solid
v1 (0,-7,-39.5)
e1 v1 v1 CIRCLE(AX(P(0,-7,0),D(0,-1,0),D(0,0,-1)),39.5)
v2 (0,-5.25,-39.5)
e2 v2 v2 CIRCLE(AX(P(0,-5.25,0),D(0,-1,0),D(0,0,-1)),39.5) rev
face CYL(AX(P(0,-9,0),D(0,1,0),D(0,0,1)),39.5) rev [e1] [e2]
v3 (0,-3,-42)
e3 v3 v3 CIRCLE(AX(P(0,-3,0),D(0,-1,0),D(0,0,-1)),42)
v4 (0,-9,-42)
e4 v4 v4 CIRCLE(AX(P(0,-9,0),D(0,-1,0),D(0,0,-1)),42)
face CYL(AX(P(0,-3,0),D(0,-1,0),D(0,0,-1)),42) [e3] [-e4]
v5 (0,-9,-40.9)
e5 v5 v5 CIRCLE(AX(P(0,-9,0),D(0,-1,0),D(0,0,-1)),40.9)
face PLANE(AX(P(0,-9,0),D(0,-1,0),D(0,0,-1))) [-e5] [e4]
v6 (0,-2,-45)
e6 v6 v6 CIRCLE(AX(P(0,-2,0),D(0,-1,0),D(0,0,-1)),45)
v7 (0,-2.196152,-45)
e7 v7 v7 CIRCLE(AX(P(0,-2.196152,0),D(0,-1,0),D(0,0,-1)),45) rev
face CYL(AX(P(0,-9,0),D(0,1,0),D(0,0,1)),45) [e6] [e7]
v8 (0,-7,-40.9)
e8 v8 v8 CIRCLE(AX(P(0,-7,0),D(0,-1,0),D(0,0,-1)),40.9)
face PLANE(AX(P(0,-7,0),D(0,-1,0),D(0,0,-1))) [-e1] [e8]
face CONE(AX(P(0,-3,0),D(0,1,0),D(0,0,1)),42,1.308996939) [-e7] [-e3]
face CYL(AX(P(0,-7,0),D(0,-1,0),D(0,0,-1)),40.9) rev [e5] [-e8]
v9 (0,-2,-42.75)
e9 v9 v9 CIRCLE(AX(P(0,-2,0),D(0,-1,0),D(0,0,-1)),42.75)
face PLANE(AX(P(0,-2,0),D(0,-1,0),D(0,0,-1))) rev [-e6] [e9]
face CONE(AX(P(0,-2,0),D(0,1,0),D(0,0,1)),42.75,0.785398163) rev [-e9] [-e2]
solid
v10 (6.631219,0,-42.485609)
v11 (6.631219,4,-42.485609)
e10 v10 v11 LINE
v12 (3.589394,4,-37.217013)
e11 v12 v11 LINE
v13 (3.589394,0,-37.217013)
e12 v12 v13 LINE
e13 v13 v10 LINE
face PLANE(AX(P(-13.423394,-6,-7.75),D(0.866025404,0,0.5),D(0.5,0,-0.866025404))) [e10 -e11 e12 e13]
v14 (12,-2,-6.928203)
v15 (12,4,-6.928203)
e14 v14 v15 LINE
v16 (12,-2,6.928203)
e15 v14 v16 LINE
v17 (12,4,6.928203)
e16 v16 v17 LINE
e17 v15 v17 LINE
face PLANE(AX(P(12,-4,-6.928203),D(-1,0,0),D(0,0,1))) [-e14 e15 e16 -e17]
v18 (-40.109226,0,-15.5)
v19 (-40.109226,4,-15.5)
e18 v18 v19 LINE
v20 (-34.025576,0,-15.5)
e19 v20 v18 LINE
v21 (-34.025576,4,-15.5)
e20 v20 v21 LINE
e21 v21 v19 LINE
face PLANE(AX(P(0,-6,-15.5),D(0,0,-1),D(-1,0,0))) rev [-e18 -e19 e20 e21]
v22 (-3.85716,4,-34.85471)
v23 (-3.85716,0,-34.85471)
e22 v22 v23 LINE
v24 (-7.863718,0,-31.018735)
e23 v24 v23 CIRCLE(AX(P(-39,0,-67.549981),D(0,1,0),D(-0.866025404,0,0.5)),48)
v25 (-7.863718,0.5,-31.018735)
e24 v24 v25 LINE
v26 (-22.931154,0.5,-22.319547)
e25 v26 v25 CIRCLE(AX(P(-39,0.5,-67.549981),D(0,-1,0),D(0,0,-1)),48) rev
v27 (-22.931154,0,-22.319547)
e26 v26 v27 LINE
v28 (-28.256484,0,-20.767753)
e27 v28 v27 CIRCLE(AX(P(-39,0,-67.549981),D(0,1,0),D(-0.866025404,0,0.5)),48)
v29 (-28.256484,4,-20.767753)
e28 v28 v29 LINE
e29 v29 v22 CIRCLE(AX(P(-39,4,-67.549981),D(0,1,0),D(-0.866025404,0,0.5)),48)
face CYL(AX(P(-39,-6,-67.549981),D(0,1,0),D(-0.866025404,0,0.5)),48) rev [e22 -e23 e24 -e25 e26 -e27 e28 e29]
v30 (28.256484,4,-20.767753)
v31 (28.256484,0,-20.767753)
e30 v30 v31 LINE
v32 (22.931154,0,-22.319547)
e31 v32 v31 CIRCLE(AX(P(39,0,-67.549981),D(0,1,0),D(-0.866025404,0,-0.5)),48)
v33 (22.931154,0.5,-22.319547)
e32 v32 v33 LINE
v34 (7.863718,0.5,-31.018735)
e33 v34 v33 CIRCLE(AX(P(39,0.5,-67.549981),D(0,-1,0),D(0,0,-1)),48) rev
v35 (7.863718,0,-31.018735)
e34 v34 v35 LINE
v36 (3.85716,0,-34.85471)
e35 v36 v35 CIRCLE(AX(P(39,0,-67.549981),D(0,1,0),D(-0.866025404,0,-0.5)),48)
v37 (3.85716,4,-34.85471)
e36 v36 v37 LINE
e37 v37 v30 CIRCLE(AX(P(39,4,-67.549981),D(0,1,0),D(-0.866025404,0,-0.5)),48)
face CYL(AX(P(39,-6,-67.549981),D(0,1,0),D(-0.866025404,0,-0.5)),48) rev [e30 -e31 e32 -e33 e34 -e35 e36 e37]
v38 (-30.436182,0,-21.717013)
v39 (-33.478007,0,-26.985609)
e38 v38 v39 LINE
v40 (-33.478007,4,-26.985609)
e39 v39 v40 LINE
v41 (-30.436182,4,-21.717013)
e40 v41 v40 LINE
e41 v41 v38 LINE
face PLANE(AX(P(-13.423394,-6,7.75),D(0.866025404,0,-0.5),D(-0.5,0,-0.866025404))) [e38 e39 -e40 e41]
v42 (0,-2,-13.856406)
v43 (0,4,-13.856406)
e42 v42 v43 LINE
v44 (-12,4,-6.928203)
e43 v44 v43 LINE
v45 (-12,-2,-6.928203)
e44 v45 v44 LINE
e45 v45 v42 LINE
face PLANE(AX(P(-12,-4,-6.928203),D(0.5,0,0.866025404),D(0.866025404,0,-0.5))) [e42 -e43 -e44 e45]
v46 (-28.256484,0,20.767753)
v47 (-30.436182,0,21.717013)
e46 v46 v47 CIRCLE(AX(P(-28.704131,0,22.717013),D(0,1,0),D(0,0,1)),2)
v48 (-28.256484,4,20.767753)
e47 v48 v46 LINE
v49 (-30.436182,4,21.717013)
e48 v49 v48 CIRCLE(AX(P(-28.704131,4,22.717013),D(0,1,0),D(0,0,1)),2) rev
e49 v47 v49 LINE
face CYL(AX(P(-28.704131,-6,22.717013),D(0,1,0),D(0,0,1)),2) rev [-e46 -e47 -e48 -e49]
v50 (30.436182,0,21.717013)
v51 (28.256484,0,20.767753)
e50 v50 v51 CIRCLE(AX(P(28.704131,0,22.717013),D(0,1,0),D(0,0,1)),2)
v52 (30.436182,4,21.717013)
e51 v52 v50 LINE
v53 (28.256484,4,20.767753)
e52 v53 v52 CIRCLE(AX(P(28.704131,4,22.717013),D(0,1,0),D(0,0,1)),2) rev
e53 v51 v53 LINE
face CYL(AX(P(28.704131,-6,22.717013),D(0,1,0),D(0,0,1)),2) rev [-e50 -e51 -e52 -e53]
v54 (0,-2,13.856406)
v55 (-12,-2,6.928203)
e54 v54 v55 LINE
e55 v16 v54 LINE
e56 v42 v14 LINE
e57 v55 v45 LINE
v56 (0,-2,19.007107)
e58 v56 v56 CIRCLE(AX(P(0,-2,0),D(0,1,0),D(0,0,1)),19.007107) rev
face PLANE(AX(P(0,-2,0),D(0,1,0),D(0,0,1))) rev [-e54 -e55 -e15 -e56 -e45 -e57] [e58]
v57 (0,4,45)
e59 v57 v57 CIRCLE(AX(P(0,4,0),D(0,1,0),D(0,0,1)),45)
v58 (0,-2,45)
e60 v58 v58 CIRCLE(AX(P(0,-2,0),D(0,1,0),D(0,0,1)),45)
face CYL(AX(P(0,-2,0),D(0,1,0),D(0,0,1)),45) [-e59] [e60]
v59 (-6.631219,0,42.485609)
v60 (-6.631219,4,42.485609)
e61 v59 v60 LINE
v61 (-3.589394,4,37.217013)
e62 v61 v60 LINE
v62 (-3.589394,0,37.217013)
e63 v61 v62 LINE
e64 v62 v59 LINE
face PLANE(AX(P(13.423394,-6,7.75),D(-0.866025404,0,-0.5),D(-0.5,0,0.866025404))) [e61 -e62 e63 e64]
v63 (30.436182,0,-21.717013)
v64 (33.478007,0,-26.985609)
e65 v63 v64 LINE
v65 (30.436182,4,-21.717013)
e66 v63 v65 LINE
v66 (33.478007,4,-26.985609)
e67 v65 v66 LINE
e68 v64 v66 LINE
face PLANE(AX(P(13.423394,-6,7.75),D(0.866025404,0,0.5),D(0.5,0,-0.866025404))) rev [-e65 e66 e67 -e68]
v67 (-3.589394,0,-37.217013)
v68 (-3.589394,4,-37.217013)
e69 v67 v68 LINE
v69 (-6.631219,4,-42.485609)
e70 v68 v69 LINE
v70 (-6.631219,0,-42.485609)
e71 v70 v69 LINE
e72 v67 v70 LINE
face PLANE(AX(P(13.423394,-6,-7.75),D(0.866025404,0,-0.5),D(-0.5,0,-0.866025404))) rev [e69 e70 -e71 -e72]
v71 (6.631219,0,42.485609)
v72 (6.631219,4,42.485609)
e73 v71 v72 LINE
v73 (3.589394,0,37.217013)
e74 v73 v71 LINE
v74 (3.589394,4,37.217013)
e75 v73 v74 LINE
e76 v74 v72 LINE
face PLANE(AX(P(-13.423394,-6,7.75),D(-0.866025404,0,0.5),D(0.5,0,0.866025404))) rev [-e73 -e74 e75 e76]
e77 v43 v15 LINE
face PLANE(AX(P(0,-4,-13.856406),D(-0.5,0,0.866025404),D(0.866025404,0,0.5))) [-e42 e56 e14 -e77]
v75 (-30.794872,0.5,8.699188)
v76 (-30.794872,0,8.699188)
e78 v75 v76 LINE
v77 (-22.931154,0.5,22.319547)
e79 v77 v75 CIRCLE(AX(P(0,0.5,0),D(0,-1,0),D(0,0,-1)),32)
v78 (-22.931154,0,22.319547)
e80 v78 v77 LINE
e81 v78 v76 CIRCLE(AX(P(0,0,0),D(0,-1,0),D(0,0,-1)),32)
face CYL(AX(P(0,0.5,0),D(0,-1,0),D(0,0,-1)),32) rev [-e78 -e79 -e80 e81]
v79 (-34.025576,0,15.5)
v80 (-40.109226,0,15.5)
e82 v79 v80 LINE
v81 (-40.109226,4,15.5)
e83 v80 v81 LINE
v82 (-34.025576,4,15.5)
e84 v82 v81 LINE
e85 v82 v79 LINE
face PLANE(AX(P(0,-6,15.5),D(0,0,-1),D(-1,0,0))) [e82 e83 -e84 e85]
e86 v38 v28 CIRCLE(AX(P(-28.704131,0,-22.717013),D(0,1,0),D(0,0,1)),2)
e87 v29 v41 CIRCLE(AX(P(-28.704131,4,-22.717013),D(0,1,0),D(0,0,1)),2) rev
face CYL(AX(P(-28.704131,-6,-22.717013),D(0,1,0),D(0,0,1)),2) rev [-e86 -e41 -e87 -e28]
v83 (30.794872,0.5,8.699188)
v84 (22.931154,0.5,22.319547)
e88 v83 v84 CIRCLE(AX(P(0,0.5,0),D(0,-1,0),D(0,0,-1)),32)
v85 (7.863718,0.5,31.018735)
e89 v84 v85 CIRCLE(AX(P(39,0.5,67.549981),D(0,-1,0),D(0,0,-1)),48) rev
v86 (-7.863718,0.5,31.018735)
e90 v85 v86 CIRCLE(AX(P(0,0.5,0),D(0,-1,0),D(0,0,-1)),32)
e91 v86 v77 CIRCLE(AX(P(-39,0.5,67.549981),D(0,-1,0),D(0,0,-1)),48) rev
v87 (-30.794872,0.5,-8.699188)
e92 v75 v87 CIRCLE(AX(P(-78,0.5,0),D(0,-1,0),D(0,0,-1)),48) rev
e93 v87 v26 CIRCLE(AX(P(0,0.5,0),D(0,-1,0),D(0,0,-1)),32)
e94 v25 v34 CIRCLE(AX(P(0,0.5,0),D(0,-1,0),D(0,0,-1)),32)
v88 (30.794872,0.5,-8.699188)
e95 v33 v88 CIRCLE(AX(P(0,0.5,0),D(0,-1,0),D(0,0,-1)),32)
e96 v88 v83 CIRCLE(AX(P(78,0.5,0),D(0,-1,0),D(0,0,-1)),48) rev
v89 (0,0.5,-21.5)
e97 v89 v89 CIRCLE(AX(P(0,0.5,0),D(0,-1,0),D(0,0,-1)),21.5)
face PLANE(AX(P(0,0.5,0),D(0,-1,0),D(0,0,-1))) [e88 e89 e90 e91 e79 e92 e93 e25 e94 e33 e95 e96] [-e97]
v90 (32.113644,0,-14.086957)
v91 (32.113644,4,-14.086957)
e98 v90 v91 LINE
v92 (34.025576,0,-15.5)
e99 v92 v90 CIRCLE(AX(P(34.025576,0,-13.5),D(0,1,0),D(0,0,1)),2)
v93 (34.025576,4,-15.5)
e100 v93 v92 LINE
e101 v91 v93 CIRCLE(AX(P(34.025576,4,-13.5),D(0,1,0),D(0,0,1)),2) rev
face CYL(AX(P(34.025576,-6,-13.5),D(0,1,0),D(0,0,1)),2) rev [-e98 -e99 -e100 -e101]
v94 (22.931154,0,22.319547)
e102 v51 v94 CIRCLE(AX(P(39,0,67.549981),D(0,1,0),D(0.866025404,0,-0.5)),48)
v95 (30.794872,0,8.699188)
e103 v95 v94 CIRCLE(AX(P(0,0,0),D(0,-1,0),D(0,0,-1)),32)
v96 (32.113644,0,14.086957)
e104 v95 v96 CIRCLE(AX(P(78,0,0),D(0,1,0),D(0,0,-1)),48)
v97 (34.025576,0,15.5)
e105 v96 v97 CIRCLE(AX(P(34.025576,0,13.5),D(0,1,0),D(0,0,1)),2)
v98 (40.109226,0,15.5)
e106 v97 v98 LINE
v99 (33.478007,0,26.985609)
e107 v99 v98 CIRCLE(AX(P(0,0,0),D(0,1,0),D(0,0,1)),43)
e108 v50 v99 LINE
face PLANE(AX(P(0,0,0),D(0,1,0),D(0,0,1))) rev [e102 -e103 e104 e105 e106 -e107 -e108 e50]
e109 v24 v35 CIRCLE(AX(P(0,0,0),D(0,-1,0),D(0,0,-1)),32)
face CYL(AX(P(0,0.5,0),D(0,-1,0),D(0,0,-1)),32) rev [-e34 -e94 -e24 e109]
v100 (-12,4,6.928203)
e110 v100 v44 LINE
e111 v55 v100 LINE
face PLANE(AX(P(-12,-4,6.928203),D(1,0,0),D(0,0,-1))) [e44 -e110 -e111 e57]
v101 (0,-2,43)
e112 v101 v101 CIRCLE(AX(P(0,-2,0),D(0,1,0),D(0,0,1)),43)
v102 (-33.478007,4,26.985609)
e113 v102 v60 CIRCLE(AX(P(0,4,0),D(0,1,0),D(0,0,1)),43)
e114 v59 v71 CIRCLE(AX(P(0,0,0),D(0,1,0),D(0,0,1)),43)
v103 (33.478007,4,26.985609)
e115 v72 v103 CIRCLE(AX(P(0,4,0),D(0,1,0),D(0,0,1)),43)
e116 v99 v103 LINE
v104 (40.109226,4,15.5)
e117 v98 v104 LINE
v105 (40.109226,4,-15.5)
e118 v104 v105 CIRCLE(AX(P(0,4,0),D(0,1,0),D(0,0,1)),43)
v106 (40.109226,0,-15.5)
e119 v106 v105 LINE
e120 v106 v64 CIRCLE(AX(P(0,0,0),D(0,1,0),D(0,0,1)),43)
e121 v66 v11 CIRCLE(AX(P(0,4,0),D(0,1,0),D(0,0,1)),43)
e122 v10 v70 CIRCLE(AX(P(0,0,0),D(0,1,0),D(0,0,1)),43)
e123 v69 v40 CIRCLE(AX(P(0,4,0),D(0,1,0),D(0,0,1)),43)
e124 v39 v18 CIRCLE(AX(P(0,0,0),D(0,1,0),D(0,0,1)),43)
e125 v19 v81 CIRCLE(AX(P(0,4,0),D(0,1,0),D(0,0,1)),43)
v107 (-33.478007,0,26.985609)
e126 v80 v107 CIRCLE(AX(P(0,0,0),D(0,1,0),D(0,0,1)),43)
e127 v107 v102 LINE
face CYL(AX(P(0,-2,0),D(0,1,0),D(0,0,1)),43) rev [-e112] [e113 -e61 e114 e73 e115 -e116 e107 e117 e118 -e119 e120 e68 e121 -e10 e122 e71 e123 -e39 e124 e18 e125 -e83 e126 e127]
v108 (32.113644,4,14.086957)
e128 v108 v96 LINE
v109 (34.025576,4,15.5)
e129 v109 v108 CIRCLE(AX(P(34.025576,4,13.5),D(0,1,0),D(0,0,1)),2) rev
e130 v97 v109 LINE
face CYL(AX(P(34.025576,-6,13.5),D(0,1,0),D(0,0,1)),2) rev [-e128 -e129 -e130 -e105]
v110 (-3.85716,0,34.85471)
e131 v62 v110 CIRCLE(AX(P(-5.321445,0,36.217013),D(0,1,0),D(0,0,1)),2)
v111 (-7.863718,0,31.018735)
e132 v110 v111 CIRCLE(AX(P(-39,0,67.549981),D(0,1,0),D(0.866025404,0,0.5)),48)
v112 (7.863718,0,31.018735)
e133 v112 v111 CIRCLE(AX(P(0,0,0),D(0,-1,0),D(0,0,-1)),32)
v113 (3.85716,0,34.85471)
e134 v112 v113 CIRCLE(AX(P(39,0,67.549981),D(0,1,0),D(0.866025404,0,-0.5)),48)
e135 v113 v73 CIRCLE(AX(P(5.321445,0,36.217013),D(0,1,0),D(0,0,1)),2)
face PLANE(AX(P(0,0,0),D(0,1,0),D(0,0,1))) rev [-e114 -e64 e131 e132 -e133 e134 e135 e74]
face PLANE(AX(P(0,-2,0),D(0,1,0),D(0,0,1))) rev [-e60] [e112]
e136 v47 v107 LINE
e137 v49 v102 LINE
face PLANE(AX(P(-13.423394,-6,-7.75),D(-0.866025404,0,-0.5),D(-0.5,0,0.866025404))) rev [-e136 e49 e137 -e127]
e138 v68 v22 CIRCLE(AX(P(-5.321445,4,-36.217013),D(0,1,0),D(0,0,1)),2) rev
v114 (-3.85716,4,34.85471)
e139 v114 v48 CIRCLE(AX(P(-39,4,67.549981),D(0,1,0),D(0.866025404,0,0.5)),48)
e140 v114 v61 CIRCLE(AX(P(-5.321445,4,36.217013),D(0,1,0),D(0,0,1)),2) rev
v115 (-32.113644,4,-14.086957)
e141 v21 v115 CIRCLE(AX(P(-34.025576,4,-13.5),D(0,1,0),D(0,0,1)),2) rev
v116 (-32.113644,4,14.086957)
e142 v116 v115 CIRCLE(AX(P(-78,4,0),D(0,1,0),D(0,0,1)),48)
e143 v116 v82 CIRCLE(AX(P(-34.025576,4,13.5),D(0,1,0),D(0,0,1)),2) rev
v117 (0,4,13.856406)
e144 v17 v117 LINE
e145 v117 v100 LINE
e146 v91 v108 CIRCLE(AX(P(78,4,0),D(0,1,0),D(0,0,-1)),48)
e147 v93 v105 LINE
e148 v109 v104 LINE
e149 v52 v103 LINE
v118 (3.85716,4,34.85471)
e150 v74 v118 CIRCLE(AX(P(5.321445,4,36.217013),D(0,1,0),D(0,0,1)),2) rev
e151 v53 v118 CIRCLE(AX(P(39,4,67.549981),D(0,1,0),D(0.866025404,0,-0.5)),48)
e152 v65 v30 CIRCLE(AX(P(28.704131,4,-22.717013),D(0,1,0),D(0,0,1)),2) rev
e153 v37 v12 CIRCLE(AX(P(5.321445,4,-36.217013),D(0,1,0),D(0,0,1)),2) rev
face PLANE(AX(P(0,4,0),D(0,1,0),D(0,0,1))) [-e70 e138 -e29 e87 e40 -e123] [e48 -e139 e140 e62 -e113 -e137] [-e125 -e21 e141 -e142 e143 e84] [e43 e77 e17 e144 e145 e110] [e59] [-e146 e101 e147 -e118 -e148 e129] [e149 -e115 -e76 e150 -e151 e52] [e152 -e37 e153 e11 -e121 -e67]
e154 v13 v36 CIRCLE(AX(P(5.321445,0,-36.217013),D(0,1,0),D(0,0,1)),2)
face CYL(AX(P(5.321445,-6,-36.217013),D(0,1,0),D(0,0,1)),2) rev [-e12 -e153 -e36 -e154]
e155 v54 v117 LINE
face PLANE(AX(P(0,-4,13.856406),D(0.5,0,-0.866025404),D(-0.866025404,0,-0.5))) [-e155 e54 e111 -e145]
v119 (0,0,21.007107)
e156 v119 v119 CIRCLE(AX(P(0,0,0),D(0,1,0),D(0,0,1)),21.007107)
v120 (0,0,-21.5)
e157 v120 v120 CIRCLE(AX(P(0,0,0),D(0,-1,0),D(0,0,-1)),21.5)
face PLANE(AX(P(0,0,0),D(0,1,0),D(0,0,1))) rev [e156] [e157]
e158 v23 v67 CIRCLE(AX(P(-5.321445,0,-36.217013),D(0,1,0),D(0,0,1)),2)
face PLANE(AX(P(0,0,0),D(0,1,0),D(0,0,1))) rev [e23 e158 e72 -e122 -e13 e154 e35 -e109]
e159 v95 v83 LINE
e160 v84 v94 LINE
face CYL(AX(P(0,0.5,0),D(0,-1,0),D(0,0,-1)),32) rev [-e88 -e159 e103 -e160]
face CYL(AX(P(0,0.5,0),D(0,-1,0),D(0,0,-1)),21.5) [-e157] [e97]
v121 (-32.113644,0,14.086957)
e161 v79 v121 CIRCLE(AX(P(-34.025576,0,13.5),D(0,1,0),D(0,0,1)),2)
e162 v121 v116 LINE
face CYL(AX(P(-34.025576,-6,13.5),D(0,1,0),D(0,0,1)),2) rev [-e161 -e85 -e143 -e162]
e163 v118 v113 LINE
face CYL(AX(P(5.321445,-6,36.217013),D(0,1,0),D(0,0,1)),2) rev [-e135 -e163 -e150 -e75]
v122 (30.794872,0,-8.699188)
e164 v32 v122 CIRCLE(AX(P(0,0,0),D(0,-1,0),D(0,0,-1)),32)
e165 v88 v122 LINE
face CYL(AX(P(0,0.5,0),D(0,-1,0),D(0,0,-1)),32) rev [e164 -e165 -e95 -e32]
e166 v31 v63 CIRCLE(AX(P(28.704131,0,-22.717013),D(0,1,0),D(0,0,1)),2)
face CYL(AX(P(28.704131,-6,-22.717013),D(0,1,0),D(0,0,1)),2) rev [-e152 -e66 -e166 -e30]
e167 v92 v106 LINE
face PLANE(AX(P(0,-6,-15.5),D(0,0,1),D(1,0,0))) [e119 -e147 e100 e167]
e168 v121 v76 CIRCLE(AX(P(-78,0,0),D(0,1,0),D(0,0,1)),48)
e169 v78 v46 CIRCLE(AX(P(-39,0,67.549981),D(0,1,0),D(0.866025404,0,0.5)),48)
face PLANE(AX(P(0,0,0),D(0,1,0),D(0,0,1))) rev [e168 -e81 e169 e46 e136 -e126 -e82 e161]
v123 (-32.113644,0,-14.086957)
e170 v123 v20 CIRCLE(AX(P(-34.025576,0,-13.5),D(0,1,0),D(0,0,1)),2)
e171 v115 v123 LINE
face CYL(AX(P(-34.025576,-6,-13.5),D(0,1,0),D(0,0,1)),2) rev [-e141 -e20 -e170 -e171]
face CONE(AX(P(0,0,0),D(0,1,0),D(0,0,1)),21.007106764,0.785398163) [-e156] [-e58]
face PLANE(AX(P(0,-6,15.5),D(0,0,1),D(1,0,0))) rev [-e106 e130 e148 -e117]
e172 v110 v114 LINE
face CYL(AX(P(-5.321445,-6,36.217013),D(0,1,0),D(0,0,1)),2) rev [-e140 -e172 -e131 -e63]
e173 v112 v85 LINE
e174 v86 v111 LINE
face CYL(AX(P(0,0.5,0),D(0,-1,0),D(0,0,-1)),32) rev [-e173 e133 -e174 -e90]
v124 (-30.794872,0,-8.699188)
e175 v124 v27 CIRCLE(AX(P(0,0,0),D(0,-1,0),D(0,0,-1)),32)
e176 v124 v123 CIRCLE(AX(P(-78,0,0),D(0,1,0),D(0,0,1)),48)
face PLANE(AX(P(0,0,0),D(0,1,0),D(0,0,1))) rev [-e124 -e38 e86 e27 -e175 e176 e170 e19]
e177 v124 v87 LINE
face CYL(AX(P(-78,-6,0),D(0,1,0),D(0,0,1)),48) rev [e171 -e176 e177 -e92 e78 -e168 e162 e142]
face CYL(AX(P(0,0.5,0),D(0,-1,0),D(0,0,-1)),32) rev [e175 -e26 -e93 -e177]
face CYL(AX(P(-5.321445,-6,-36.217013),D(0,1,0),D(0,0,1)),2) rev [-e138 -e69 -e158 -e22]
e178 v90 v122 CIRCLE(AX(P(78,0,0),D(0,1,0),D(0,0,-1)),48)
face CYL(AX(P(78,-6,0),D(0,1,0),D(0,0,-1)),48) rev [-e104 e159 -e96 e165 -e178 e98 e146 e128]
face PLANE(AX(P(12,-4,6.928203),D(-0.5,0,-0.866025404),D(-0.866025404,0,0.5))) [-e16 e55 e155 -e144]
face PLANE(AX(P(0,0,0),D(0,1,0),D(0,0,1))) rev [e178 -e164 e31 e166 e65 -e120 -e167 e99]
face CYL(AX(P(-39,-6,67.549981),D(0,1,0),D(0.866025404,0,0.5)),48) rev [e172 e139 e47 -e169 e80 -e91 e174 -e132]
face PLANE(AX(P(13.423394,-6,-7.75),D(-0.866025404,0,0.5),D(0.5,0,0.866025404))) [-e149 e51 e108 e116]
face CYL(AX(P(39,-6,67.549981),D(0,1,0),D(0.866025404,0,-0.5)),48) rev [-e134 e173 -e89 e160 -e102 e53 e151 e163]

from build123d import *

# Parameters (mm, degrees)
SKIZZE1_R                            = 44
AUFSATZ_LINEAR_AUSTRAGEN1_DEPTH      = 4
SCHNITT_LINEAR_START                 = -10
SCHNITT_LINEAR_AUSTRAGEN2_DEPTH      = 10
SKIZZE4_R                            = 21.007106764
AUFSATZ_LINEAR_AUSTRAGEN4_DEPTH      = 6
KREISMUSTER1_COUNT                   = 6
SCHNITT_LINEAR_AUSTRAGEN3_DEPTH      = 4
SCHNITT_LINEAR_AUSTRAGEN3_DEPTH_BACK = 10
VERRUNDUNG1_R                        = 2
SKIZZE8_R                            = 45
SKIZZE8_R_2                          = 43
AUFSATZ_LINEAR_AUSTRAGEN2_DEPTH      = 6
SKIZZE9_R                            = 45
SKIZZE9_R_2                          = 39.5
AUFSATZ_LINEAR_AUSTRAGEN3_DEPTH      = 7
FASE1_SIZE                           = 3.25
SKIZZE7_R                            = 32
SKIZZE7_R_2                          = 21.5
SCHNITT_LINEAR_AUSTRAGEN7_DEPTH      = 0.5
SKIZZE10_R                           = 50
SKIZZE10_R_2                         = 42
SCHNITT_LINEAR_AUSTRAGEN9_DEPTH      = 6
SKIZZE11_R                           = 40.9
SKIZZE11_R_2                         = 30
SCHNITT_LINEAR_AUSTRAGEN10_DEPTH     = 2
FASE2_SIZE                           = 0.803847577
FASE2_SIZE_2                         = 3
FASE3_SIZE                           = 2


# Some blends are built 0.0001 mm under size
with BuildPart() as part:
    # Skizze1 → Aufsatz-Linear austragen1 (new body)
    with BuildSketch(Plane(origin=(0, 0, 0), x_dir=(1, 0, 0), z_dir=(0, 1, 0))):
        with Locations(Location((0, 0, 0), (0, 0, 270))):
            Circle(SKIZZE1_R)
    extrude(amount=AUFSATZ_LINEAR_AUSTRAGEN1_DEPTH)

    # Skizze2 → Schnitt-Linear austragen2 (cut)
    with BuildSketch(Plane(origin=(0, 4, 0), x_dir=(1, 0, 0), z_dir=(0, 1, 0)).offset(SCHNITT_LINEAR_START)):
        with BuildLine():
            ThreePointArc((-30, 0), (-30.647234858, 7.855929826), (-32.571484726, 15.5))
            Line((-32.571484726, 15.5), (-41.179485184, 15.5))
            ThreePointArc((-41.179485184, 15.5), (-44, 0), (-41.179485184, -15.5))
            Line((-41.179485184, -15.5), (-32.571484726, -15.5))
            ThreePointArc((-32.571484726, -15.5), (-30.647234858, -7.855929826), (-30, 0))
        make_face()
    schnitt_linear_austragen2 = extrude(amount=SCHNITT_LINEAR_AUSTRAGEN2_DEPTH, mode=Mode.SUBTRACT)

    # Skizze4 → Aufsatz-Linear austragen4 (add)
    with BuildSketch(Plane(origin=(0, 4, 0), x_dir=(1, 0, 0), z_dir=(0, 1, 0))):
        with Locations(Location((0, 0, 0), (0, 0, 270))):
            Circle(SKIZZE4_R)
    extrude(amount=-AUFSATZ_LINEAR_AUSTRAGEN4_DEPTH)

    # Kreismuster1: Schnitt-Linear austragen2 ×6 about axis
    kreismuster1_axis = Axis((0, 0, 0), (0, 1, 0))
    for i in range(1, KREISMUSTER1_COUNT):
        add(schnitt_linear_austragen2.rotate(kreismuster1_axis, i * 360 / KREISMUSTER1_COUNT), mode=Mode.SUBTRACT)

    # Skizze3 → Schnitt-Linear austragen3 (cut, two sides: drawn at the far end of the back side and taken through both)
    with BuildSketch(Plane.XZ.offset(-SCHNITT_LINEAR_AUSTRAGEN3_DEPTH_BACK)):
        Polygon((12, 6.92820323), (0, 13.856406461), (-12, 6.92820323), (-12, -6.92820323), (0, -13.856406461), (12, -6.92820323), align=None)
    extrude(amount=SCHNITT_LINEAR_AUSTRAGEN3_DEPTH + SCHNITT_LINEAR_AUSTRAGEN3_DEPTH_BACK, mode=Mode.SUBTRACT)

    # Verrundung1
    verrundung1_edges = [part.edges().sort_by_distance(p)[0] for p in [
        (-32.571484726, 2, 15.5),
        (-32.571484726, 2, -15.5),
        (-29.709136122, 2, -20.457733212),
        (-2.862348604, 2, -35.957733212),
        (2.862348604, 2, -35.957733212),
        (29.709136122, 2, -20.457733212),
        (32.571484726, 2, -15.5),
        (32.571484726, 2, 15.5),
        (29.709136122, 2, 20.457733212),
        (2.862348604, 2, 35.957733212),
        (-2.862348604, 2, 35.957733212),
        (-29.709136122, 2, 20.457733212),
    ]]
    fillet(verrundung1_edges, radius=VERRUNDUNG1_R)

    # Skizze8 → Aufsatz-Linear austragen2 (add)
    with BuildSketch(Plane(origin=(0, 4, 0), x_dir=(1, 0, 0), z_dir=(0, 1, 0))):
        with Locations(Location((0, 0, 0), (0, 0, 270))):
            Circle(SKIZZE8_R)
        with Locations(Location((0, 0, 0), (0, 0, 270))):
            Circle(SKIZZE8_R_2, mode=Mode.SUBTRACT)
    extrude(amount=-AUFSATZ_LINEAR_AUSTRAGEN2_DEPTH)

    # Skizze7 → Schnitt-Linear austragen7 (cut)
    with BuildSketch(Plane.XZ):
        Circle(SKIZZE7_R)
        with Locations(Location((0, 0, 0), (0, 0, 270))):
            Circle(SKIZZE7_R_2, mode=Mode.SUBTRACT)
    extrude(amount=-SCHNITT_LINEAR_AUSTRAGEN7_DEPTH, mode=Mode.SUBTRACT)

    # Fase3
    fase3_edges = [part.edges().sort_by_distance(p)[0] for p in [
        (0, -2, -21.007106764),
    ]]
    chamfer(fase3_edges, length=FASE3_SIZE - 0.0001)  # a hair under: the kernel refuses the full size


with BuildPart() as body_2:
    # Skizze9 → Aufsatz-Linear austragen3 (new body)
    with BuildSketch(Plane.XZ.offset(2)):
        with Locations(Location((0, 0, 0), (0, 0, 270))):
            Circle(SKIZZE9_R)
        with Locations(Location((0, 0, 0), (0, 0, 270))):
            Circle(SKIZZE9_R_2, mode=Mode.SUBTRACT)
    extrude(amount=AUFSATZ_LINEAR_AUSTRAGEN3_DEPTH)

    # Fase1
    fase1_edges = [body_2.edges().sort_by_distance(p)[0] for p in [
        (0, -2, 39.5),
    ]]
    chamfer(fase1_edges, length=FASE1_SIZE)

    # Skizze10 → Schnitt-Linear austragen9 (cut)
    with BuildSketch(Plane.XZ.offset(9)):
        Circle(SKIZZE10_R)
        with Locations(Location((0, 0, 0), (0, 0, 270))):
            Circle(SKIZZE10_R_2, mode=Mode.SUBTRACT)
    extrude(amount=-SCHNITT_LINEAR_AUSTRAGEN9_DEPTH, mode=Mode.SUBTRACT)

    # Skizze11 → Schnitt-Linear austragen10 (cut)
    with BuildSketch(Plane.XZ.offset(9)):
        with Locations(Location((0, 0, 0), (0, 0, 270))):
            Circle(SKIZZE11_R)
        with Locations((-1.948563864, 1.772578218)):
            Circle(SKIZZE11_R_2, mode=Mode.SUBTRACT)
    extrude(amount=-SCHNITT_LINEAR_AUSTRAGEN10_DEPTH, mode=Mode.SUBTRACT)

    # Fase2
    # the kernel refuses this chamfer: 3, 0.803847577 mm, written as the material it takes off along each edge
    with BuildSketch(Plane(origin=(0, -3, 0), x_dir=(0, 0, -1), z_dir=(1, 0, 0))) as fase2_piece_1_section:
        Polygon((45, FASE2_SIZE), (45 - FASE2_SIZE_2, 0), (45, 0), align=None)
    fase2_piece_1 = revolve(axis=Axis((0, -3, 0), (0, 1, 0)), mode=Mode.PRIVATE)
    fase2_piece_1 = fase2_piece_1 - Plane(origin=(0, -2.653988874, 0), x_dir=(0, 0, -1), z_dir=(0, -1, 0)) * Cylinder(42, 180, mode=Mode.PRIVATE)
    add(fase2_piece_1, mode=Mode.SUBTRACT)


solid = Compound([part.part, body_2.part])
